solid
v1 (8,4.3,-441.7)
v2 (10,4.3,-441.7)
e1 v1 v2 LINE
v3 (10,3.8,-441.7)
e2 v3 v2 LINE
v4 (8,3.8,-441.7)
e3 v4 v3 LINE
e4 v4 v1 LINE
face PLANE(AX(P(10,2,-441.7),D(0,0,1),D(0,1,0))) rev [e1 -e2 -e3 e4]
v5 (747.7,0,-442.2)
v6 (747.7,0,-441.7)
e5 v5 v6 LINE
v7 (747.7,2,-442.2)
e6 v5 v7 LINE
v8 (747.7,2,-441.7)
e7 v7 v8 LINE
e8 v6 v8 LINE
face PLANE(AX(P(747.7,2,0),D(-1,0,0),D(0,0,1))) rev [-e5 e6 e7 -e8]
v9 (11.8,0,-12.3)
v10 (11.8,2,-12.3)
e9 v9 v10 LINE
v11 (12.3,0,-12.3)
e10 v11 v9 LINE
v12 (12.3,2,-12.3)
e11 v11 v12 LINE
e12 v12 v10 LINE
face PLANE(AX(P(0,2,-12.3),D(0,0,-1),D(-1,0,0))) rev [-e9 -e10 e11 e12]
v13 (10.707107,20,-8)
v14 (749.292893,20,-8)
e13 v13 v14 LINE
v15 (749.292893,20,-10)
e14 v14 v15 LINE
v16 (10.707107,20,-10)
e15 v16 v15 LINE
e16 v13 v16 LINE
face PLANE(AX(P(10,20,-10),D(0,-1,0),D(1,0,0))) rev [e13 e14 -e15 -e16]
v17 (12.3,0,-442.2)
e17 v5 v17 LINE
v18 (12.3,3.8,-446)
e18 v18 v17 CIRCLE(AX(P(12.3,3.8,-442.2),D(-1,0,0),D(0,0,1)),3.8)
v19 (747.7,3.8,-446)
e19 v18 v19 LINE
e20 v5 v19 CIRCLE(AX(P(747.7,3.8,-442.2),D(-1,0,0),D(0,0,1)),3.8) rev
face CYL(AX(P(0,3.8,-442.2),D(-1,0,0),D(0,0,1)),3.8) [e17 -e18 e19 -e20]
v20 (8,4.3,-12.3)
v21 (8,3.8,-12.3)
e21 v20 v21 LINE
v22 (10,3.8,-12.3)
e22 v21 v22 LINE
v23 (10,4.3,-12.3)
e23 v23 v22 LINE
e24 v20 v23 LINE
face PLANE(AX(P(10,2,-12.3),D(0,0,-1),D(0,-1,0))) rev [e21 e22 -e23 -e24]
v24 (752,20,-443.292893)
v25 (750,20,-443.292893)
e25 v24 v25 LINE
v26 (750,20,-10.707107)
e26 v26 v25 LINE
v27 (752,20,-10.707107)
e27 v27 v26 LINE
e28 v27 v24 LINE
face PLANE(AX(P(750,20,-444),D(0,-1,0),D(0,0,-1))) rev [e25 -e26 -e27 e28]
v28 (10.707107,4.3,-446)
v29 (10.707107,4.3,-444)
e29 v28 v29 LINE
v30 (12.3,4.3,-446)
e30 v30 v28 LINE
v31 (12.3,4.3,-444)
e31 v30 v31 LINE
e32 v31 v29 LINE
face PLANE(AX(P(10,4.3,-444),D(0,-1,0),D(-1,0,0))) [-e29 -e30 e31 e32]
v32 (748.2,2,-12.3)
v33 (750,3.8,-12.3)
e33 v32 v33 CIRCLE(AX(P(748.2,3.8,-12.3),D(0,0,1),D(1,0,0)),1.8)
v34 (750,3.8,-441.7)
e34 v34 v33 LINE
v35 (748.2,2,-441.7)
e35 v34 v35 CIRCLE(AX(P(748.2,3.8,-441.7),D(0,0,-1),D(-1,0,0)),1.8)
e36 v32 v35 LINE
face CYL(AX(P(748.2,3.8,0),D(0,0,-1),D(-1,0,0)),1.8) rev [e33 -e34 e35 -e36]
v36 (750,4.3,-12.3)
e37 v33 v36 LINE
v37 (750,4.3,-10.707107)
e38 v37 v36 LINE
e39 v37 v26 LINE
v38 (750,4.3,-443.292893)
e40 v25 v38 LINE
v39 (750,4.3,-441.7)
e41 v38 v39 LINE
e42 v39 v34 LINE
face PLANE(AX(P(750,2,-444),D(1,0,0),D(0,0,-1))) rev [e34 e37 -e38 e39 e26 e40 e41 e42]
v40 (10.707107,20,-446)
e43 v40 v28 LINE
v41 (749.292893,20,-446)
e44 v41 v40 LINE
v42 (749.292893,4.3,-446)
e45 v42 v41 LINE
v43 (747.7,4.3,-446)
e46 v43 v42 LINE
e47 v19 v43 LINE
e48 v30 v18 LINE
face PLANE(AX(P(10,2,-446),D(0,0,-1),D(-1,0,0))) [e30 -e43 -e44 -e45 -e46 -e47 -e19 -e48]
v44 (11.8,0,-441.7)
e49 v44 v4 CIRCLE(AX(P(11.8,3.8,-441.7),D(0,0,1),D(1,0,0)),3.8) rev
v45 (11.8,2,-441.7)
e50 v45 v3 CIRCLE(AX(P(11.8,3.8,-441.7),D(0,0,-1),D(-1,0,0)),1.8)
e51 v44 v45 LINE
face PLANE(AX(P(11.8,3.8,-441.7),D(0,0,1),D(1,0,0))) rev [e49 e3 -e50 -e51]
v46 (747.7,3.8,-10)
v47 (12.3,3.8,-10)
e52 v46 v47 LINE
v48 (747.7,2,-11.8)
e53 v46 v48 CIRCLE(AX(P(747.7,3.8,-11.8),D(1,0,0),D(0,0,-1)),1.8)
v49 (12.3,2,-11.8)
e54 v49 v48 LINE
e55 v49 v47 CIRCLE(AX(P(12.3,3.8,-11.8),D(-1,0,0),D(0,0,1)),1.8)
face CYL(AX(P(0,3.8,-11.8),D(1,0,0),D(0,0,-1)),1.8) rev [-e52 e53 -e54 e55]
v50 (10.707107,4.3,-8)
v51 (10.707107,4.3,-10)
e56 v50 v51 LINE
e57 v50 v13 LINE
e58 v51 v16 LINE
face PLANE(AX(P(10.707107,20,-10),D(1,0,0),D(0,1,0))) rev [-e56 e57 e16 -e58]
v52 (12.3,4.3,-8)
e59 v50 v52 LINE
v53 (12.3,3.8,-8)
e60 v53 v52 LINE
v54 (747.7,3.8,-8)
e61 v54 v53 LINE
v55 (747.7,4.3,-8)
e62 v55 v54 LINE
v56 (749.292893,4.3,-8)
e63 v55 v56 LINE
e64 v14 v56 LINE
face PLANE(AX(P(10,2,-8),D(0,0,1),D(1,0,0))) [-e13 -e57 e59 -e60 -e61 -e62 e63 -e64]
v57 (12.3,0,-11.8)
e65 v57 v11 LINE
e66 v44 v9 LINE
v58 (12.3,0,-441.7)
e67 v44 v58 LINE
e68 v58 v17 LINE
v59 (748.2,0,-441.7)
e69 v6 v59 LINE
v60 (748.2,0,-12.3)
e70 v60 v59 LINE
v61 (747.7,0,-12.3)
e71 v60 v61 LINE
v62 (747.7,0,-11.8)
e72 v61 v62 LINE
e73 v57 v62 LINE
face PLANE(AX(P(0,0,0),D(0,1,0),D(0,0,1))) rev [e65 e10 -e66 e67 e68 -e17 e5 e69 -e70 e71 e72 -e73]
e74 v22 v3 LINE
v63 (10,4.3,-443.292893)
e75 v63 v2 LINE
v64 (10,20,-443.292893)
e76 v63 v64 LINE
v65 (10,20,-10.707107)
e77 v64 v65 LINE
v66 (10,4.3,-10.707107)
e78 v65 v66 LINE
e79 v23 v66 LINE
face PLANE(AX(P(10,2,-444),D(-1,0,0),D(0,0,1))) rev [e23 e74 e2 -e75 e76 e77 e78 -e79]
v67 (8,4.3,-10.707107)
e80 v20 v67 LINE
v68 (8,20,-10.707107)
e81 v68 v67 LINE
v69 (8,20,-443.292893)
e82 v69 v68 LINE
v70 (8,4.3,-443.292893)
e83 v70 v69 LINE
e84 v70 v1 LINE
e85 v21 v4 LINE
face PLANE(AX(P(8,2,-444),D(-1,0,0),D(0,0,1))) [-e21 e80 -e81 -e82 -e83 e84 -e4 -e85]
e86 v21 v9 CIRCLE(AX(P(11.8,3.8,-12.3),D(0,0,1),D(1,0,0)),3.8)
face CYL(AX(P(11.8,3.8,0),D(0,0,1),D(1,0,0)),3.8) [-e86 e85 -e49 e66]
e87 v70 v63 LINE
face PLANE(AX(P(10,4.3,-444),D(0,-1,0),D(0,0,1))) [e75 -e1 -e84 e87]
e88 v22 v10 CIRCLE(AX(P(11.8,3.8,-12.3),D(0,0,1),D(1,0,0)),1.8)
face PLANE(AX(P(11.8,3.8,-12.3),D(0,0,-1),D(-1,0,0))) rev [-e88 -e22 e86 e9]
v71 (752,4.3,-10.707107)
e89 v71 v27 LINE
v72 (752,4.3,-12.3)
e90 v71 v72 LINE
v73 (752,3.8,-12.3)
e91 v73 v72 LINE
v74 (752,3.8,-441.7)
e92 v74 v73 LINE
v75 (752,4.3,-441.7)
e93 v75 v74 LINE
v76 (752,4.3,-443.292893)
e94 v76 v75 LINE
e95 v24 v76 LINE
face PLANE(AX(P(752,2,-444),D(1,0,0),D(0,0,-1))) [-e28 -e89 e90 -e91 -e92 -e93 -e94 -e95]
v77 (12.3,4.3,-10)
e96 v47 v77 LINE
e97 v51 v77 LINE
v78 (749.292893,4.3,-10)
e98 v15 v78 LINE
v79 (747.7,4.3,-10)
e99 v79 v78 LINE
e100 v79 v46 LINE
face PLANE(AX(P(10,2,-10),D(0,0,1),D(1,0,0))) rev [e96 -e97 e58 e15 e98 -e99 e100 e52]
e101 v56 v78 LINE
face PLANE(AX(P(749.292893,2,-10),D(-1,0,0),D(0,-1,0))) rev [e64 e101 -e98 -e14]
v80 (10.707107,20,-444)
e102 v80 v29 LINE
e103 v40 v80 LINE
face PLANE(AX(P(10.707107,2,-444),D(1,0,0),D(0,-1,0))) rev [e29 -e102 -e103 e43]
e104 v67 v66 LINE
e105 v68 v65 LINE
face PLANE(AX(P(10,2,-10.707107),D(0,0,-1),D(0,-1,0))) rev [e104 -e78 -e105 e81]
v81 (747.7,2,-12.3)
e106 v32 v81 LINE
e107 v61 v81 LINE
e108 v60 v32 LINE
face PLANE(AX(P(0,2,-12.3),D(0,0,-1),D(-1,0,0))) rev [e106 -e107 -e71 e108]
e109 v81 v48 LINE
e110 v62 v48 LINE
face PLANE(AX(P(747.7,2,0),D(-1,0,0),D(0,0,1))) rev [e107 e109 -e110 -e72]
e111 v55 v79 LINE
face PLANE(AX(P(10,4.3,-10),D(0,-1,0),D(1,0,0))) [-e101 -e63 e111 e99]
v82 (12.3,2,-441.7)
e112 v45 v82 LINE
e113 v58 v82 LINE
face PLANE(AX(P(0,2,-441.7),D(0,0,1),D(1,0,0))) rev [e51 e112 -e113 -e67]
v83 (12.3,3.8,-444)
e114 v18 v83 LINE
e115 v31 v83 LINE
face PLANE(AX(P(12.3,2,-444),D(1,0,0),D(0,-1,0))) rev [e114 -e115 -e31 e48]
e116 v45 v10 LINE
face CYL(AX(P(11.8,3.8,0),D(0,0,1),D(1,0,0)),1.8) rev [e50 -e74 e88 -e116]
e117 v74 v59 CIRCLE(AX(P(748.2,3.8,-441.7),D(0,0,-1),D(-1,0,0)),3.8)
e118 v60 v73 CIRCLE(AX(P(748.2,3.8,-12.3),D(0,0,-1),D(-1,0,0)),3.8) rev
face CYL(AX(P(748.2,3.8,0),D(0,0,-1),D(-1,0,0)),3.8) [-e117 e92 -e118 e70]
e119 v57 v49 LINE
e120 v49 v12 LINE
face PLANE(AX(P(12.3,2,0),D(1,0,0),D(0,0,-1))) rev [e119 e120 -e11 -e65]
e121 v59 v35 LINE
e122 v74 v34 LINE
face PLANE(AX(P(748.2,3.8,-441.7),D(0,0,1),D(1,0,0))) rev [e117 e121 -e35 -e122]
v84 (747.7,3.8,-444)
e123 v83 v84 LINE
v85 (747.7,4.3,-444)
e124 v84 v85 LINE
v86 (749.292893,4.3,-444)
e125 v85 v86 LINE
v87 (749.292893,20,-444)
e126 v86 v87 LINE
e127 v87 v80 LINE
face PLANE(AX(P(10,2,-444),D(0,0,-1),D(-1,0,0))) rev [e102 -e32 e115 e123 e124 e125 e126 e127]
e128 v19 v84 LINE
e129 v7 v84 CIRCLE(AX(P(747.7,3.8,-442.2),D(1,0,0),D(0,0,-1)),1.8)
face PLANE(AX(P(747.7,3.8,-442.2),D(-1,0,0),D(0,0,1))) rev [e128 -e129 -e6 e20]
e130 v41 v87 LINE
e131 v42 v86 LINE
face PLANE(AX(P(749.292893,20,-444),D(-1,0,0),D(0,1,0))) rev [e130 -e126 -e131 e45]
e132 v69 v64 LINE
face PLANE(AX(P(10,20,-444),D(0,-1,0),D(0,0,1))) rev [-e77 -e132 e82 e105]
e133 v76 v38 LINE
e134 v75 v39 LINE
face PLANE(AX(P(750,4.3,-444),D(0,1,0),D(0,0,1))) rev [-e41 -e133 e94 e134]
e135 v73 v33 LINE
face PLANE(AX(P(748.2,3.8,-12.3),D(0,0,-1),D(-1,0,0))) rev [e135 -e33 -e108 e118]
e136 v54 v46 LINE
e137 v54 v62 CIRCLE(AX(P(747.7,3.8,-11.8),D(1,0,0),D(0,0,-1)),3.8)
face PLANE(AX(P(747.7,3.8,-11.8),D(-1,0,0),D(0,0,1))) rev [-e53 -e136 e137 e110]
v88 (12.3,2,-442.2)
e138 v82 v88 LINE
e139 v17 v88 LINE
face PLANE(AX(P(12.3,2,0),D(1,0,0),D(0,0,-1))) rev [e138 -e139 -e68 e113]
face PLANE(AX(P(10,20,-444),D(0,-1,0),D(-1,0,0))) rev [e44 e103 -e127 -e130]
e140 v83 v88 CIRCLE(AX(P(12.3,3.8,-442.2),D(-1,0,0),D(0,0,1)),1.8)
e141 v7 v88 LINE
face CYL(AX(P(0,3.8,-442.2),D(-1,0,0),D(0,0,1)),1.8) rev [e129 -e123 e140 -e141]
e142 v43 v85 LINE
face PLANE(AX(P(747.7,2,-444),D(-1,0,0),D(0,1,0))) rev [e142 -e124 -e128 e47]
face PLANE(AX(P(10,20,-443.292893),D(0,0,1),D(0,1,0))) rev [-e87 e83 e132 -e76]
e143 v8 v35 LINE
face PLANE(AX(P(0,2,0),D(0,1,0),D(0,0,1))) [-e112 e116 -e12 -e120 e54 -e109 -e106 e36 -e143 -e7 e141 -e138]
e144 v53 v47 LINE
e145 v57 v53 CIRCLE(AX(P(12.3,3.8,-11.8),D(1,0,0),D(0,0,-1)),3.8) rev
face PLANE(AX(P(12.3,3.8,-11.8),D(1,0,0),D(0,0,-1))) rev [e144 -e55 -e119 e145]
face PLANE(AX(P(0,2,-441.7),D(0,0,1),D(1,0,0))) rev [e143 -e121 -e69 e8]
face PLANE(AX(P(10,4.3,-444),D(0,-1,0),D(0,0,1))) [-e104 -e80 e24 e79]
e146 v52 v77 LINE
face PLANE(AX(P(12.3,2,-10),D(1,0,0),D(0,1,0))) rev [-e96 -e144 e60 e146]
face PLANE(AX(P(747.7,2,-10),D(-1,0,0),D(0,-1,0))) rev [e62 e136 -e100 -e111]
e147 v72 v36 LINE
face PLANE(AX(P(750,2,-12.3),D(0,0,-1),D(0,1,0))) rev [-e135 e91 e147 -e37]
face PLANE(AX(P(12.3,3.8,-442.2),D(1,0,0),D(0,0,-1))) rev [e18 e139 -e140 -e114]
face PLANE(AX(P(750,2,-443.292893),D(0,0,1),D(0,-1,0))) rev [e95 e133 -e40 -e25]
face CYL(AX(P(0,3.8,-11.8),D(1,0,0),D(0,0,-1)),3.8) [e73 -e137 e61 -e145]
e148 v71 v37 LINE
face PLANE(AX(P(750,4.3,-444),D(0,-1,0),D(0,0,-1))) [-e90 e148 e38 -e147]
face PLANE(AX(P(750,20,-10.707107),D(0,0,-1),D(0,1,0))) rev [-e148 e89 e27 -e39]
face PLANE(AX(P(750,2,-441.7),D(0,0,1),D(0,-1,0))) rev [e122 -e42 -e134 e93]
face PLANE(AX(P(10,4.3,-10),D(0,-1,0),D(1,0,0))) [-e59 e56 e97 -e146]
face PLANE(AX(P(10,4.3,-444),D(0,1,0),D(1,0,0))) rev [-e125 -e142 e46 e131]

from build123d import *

# Parameters (mm, degrees)
SKETCH1_W                  = 760
SKETCH1_H                  = 454
BOSS_EXTRUDE1_DEPTH        = 20
SKETCH2_W                  = 740
SKETCH2_H                  = 434
CUT_EXTRUDE1_DEPTH         = 18
CONVERT_SOLID2_OUTLINE_W   = 15.7
CONVERT_SOLID2_OUTLINE_H   = 2
CONVERT_SOLID2_DEPTH       = 10.707106781
CONVERT_SOLID2_START       = 749.292893219
CONVERT_SOLID2_2_OUTLINE_W = 15.7
CONVERT_SOLID2_2_OUTLINE_H = 2
CONVERT_SOLID2_2_DEPTH     = 10.707106781
CONVERT_SOLID2_3_DEPTH     = 760
CONVERT_SOLID2_4_DEPTH     = 8
CONVERT_SOLID2_START_2     = 752
CONVERT_SOLID2_5_DEPTH     = 8
CONVERT_SOLID2_START_3     = 8
CONVERT_SOLID2_6_DEPTH     = 4.3
CONVERT_SOLID2_START_4     = 747.7
CONVERT_SOLID2_7_DEPTH     = 4.3
CONVERT_SOLID2_START_5     = 12.3
CONVERT_SOLID2_8_DEPTH     = 735.4
CONVERT_SOLID2_START_6     = -441.7
CONVERT_SOLID2_9_DEPTH     = 429.4
CONVERT_SOLID2_10_DEPTH    = 429.4


with BuildPart() as part:
    # Sketch1 → Boss-Extrude1 (new body)
    with BuildSketch(Plane(origin=(0, 0, 0), x_dir=(1, 0, 0), z_dir=(0, 1, 0))):
        with Locations((380, 227)):
            Rectangle(SKETCH1_W, SKETCH1_H)
    extrude(amount=BOSS_EXTRUDE1_DEPTH)

    # Sketch2 → Cut-Extrude1 (cut)
    with BuildSketch(Plane(origin=(0, 20, 0), x_dir=(1, 0, 0), z_dir=(0, 1, 0))):
        with Locations((380, 227)):
            Rectangle(SKETCH2_W, SKETCH2_H)
    extrude(amount=-CUT_EXTRUDE1_DEPTH, mode=Mode.SUBTRACT)

    # Convert-Solid2: read off the stored shape, not the designer's step
    # Convert-Solid2 outline → Convert-Solid2 (cut)
    with BuildSketch(Plane.YZ):
        with Locations((12.15, -9)):
            Rectangle(CONVERT_SOLID2_OUTLINE_W, CONVERT_SOLID2_OUTLINE_H)
        with Locations((12.15, -445)):
            Rectangle(CONVERT_SOLID2_OUTLINE_W, CONVERT_SOLID2_OUTLINE_H)
    extrude(amount=CONVERT_SOLID2_DEPTH, mode=Mode.SUBTRACT)

    # Convert-Solid2 2 outline → Convert-Solid2 2 (cut)
    with BuildSketch(Plane.YZ.offset(CONVERT_SOLID2_START)):
        with Locations((12.15, -9)):
            Rectangle(CONVERT_SOLID2_2_OUTLINE_W, CONVERT_SOLID2_2_OUTLINE_H)
        with Locations((12.15, -445)):
            Rectangle(CONVERT_SOLID2_2_OUTLINE_W, CONVERT_SOLID2_2_OUTLINE_H)
    extrude(amount=CONVERT_SOLID2_2_DEPTH, mode=Mode.SUBTRACT)

    # Convert-Solid2 3 outline → Convert-Solid2 3 (cut)
    with BuildSketch(Plane.YZ):
        with BuildLine():
            Line((4.3, -441.7), (2, -441.7))
            Line((2, -441.7), (2, -442.2))
            ThreePointArc((2, -442.2), (2.527207794, -443.472792206), (3.8, -444))
            Line((3.8, -444), (20, -444))
            Line((20, -444), (20, -443.292893219))
            Line((20, -443.292893219), (4.3, -443.292893219))
            Line((4.3, -443.292893219), (4.3, -441.7))
        make_face()
        with BuildLine():
            Line((2, -11.8), (2, -12.3))
            Line((2, -12.3), (4.3, -12.3))
            Line((4.3, -12.3), (4.3, -10.707106781))
            Line((4.3, -10.707106781), (20, -10.707106781))
            Line((20, -10.707106781), (20, -10))
            Line((20, -10), (3.8, -10))
            ThreePointArc((3.8, -10), (2.527207794, -10.527207794), (2, -11.8))
        make_face()
        with BuildLine():
            ThreePointArc((3.8, -446), (1.112994231, -444.887005769), (0, -442.2))
            Line((0, -442.2), (0, -454))
            Line((0, -454), (20, -454))
            Line((20, -454), (20, -446))
            Line((20, -446), (3.8, -446))
        make_face()
        with BuildLine():
            Line((0, 0), (0, -11.8))
            ThreePointArc((0, -11.8), (1.112994231, -9.112994231), (3.8, -8))
            Line((3.8, -8), (20, -8))
            Line((20, -8), (20, 0))
            Line((20, 0), (0, 0))
        make_face()
    extrude(amount=CONVERT_SOLID2_3_DEPTH, mode=Mode.SUBTRACT)

    # Convert-Solid2 4 outline → Convert-Solid2 4 (cut)
    with BuildSketch(Plane.YZ):
        with BuildLine():
            Line((2, -442.2), (2, -441.7))
            Line((2, -441.7), (4.3, -441.7))
            Line((4.3, -441.7), (4.3, -443.292893219))
            Line((4.3, -443.292893219), (20, -443.292893219))
            Line((20, -443.292893219), (20, -10.707106781))
            Line((20, -10.707106781), (4.3, -10.707106781))
            Line((4.3, -10.707106781), (4.3, -12.3))
            Line((4.3, -12.3), (2, -12.3))
            Line((2, -12.3), (2, -11.8))
            ThreePointArc((2, -11.8), (2.527207794, -10.527207794), (3.8, -10))
            Line((3.8, -10), (4.3, -10))
            Line((4.3, -10), (4.3, -8))
            Line((4.3, -8), (3.8, -8))
            ThreePointArc((3.8, -8), (1.112994231, -9.112994231), (0, -11.8))
            Line((0, -11.8), (0, -442.2))
            ThreePointArc((0, -442.2), (1.112994231, -444.887005769), (3.8, -446))
            Line((3.8, -446), (4.3, -446))
            Line((4.3, -446), (4.3, -444))
            Line((4.3, -444), (3.8, -444))
            ThreePointArc((3.8, -444), (2.527207794, -443.472792206), (2, -442.2))
        make_face()
    extrude(amount=CONVERT_SOLID2_4_DEPTH, mode=Mode.SUBTRACT)

    # Convert-Solid2 5 outline → Convert-Solid2 5 (cut)
    with BuildSketch(Plane.YZ.offset(CONVERT_SOLID2_START_2)):
        with BuildLine():
            Line((2, -442.2), (2, -441.7))
            Line((2, -441.7), (4.3, -441.7))
            Line((4.3, -441.7), (4.3, -443.292893219))
            Line((4.3, -443.292893219), (20, -443.292893219))
            Line((20, -443.292893219), (20, -10.707106781))
            Line((20, -10.707106781), (4.3, -10.707106781))
            Line((4.3, -10.707106781), (4.3, -12.3))
            Line((4.3, -12.3), (2, -12.3))
            Line((2, -12.3), (2, -11.8))
            ThreePointArc((2, -11.8), (2.527207794, -10.527207794), (3.8, -10))
            Line((3.8, -10), (4.3, -10))
            Line((4.3, -10), (4.3, -8))
            Line((4.3, -8), (3.8, -8))
            ThreePointArc((3.8, -8), (1.112994231, -9.112994231), (0, -11.8))
            Line((0, -11.8), (0, -442.2))
            ThreePointArc((0, -442.2), (1.112994231, -444.887005769), (3.8, -446))
            Line((3.8, -446), (4.3, -446))
            Line((4.3, -446), (4.3, -444))
            Line((4.3, -444), (3.8, -444))
            ThreePointArc((3.8, -444), (2.527207794, -443.472792206), (2, -442.2))
        make_face()
    extrude(amount=CONVERT_SOLID2_5_DEPTH, mode=Mode.SUBTRACT)

    # Convert-Solid2 6 outline → Convert-Solid2 6 (cut)
    with BuildSketch(Plane.YZ.offset(CONVERT_SOLID2_START_3)):
        with BuildLine():
            Line((2, -442.2), (2, -441.7))
            Line((2, -441.7), (0, -441.7))
            Line((0, -441.7), (0, -442.2))
            ThreePointArc((0, -442.2), (1.112994231, -444.887005769), (3.8, -446))
            Line((3.8, -446), (4.3, -446))
            Line((4.3, -446), (4.3, -444))
            Line((4.3, -444), (3.8, -444))
            ThreePointArc((3.8, -444), (2.527207794, -443.472792206), (2, -442.2))
        make_face()
        with BuildLine():
            Line((0, -12.3), (2, -12.3))
            Line((2, -12.3), (2, -11.8))
            ThreePointArc((2, -11.8), (2.527207794, -10.527207794), (3.8, -10))
            Line((3.8, -10), (4.3, -10))
            Line((4.3, -10), (4.3, -8))
            Line((4.3, -8), (3.8, -8))
            ThreePointArc((3.8, -8), (1.112994231, -9.112994231), (0, -11.8))
            Line((0, -11.8), (0, -12.3))
        make_face()
    extrude(amount=CONVERT_SOLID2_6_DEPTH, mode=Mode.SUBTRACT)

    # Convert-Solid2 7 outline → Convert-Solid2 7 (cut)
    with BuildSketch(Plane.YZ.offset(CONVERT_SOLID2_START_4)):
        with BuildLine():
            Line((2, -442.2), (2, -441.7))
            Line((2, -441.7), (0, -441.7))
            Line((0, -441.7), (0, -442.2))
            ThreePointArc((0, -442.2), (1.112994231, -444.887005769), (3.8, -446))
            Line((3.8, -446), (4.3, -446))
            Line((4.3, -446), (4.3, -444))
            Line((4.3, -444), (3.8, -444))
            ThreePointArc((3.8, -444), (2.527207794, -443.472792206), (2, -442.2))
        make_face()
        with BuildLine():
            Line((0, -12.3), (2, -12.3))
            Line((2, -12.3), (2, -11.8))
            ThreePointArc((2, -11.8), (2.527207794, -10.527207794), (3.8, -10))
            Line((3.8, -10), (4.3, -10))
            Line((4.3, -10), (4.3, -8))
            Line((4.3, -8), (3.8, -8))
            ThreePointArc((3.8, -8), (1.112994231, -9.112994231), (0, -11.8))
            Line((0, -11.8), (0, -12.3))
        make_face()
    extrude(amount=CONVERT_SOLID2_7_DEPTH, mode=Mode.SUBTRACT)

    # Convert-Solid2 8 outline → Convert-Solid2 8 (add)
    with BuildSketch(Plane.YZ.offset(CONVERT_SOLID2_START_5)):
        with BuildLine():
            ThreePointArc((3.8, -444), (2.527207794, -443.472792206), (2, -442.2))
            Line((2, -442.2), (2, -444))
            Line((2, -444), (3.8, -444))
        make_face()
        with BuildLine():
            Line((2, -10), (2, -11.8))
            ThreePointArc((2, -11.8), (2.527207794, -10.527207794), (3.8, -10))
            Line((3.8, -10), (2, -10))
        make_face()
    extrude(amount=CONVERT_SOLID2_8_DEPTH)

    # Convert-Solid2 9 outline → Convert-Solid2 9 (cut)
    with BuildSketch(Plane.XY.offset(CONVERT_SOLID2_START_6)):
        with BuildLine():
            Line((752, 0), (752, 3.8))
            ThreePointArc((752, 3.8), (750.887005769, 1.112994231), (748.2, 0))
            Line((748.2, 0), (752, 0))
        make_face()
        with BuildLine():
            Line((8, 0), (11.8, 0))
            ThreePointArc((11.8, 0), (9.112994231, 1.112994231), (8, 3.8))
            Line((8, 3.8), (8, 0))
        make_face()
    extrude(amount=CONVERT_SOLID2_9_DEPTH, mode=Mode.SUBTRACT)

    # Convert-Solid2 10 outline → Convert-Solid2 10 (add)
    with BuildSketch(Plane.XY.offset(CONVERT_SOLID2_START_6)):
        with BuildLine():
            Line((750, 2), (750, 3.8))
            ThreePointArc((750, 3.8), (749.472792206, 2.527207794), (748.2, 2))
            Line((748.2, 2), (750, 2))
        make_face()
        with BuildLine():
            Line((10, 2), (11.8, 2))
            ThreePointArc((11.8, 2), (10.527207794, 2.527207794), (10, 3.8))
            Line((10, 3.8), (10, 2))
        make_face()
    extrude(amount=CONVERT_SOLID2_10_DEPTH)


solid = part.part
